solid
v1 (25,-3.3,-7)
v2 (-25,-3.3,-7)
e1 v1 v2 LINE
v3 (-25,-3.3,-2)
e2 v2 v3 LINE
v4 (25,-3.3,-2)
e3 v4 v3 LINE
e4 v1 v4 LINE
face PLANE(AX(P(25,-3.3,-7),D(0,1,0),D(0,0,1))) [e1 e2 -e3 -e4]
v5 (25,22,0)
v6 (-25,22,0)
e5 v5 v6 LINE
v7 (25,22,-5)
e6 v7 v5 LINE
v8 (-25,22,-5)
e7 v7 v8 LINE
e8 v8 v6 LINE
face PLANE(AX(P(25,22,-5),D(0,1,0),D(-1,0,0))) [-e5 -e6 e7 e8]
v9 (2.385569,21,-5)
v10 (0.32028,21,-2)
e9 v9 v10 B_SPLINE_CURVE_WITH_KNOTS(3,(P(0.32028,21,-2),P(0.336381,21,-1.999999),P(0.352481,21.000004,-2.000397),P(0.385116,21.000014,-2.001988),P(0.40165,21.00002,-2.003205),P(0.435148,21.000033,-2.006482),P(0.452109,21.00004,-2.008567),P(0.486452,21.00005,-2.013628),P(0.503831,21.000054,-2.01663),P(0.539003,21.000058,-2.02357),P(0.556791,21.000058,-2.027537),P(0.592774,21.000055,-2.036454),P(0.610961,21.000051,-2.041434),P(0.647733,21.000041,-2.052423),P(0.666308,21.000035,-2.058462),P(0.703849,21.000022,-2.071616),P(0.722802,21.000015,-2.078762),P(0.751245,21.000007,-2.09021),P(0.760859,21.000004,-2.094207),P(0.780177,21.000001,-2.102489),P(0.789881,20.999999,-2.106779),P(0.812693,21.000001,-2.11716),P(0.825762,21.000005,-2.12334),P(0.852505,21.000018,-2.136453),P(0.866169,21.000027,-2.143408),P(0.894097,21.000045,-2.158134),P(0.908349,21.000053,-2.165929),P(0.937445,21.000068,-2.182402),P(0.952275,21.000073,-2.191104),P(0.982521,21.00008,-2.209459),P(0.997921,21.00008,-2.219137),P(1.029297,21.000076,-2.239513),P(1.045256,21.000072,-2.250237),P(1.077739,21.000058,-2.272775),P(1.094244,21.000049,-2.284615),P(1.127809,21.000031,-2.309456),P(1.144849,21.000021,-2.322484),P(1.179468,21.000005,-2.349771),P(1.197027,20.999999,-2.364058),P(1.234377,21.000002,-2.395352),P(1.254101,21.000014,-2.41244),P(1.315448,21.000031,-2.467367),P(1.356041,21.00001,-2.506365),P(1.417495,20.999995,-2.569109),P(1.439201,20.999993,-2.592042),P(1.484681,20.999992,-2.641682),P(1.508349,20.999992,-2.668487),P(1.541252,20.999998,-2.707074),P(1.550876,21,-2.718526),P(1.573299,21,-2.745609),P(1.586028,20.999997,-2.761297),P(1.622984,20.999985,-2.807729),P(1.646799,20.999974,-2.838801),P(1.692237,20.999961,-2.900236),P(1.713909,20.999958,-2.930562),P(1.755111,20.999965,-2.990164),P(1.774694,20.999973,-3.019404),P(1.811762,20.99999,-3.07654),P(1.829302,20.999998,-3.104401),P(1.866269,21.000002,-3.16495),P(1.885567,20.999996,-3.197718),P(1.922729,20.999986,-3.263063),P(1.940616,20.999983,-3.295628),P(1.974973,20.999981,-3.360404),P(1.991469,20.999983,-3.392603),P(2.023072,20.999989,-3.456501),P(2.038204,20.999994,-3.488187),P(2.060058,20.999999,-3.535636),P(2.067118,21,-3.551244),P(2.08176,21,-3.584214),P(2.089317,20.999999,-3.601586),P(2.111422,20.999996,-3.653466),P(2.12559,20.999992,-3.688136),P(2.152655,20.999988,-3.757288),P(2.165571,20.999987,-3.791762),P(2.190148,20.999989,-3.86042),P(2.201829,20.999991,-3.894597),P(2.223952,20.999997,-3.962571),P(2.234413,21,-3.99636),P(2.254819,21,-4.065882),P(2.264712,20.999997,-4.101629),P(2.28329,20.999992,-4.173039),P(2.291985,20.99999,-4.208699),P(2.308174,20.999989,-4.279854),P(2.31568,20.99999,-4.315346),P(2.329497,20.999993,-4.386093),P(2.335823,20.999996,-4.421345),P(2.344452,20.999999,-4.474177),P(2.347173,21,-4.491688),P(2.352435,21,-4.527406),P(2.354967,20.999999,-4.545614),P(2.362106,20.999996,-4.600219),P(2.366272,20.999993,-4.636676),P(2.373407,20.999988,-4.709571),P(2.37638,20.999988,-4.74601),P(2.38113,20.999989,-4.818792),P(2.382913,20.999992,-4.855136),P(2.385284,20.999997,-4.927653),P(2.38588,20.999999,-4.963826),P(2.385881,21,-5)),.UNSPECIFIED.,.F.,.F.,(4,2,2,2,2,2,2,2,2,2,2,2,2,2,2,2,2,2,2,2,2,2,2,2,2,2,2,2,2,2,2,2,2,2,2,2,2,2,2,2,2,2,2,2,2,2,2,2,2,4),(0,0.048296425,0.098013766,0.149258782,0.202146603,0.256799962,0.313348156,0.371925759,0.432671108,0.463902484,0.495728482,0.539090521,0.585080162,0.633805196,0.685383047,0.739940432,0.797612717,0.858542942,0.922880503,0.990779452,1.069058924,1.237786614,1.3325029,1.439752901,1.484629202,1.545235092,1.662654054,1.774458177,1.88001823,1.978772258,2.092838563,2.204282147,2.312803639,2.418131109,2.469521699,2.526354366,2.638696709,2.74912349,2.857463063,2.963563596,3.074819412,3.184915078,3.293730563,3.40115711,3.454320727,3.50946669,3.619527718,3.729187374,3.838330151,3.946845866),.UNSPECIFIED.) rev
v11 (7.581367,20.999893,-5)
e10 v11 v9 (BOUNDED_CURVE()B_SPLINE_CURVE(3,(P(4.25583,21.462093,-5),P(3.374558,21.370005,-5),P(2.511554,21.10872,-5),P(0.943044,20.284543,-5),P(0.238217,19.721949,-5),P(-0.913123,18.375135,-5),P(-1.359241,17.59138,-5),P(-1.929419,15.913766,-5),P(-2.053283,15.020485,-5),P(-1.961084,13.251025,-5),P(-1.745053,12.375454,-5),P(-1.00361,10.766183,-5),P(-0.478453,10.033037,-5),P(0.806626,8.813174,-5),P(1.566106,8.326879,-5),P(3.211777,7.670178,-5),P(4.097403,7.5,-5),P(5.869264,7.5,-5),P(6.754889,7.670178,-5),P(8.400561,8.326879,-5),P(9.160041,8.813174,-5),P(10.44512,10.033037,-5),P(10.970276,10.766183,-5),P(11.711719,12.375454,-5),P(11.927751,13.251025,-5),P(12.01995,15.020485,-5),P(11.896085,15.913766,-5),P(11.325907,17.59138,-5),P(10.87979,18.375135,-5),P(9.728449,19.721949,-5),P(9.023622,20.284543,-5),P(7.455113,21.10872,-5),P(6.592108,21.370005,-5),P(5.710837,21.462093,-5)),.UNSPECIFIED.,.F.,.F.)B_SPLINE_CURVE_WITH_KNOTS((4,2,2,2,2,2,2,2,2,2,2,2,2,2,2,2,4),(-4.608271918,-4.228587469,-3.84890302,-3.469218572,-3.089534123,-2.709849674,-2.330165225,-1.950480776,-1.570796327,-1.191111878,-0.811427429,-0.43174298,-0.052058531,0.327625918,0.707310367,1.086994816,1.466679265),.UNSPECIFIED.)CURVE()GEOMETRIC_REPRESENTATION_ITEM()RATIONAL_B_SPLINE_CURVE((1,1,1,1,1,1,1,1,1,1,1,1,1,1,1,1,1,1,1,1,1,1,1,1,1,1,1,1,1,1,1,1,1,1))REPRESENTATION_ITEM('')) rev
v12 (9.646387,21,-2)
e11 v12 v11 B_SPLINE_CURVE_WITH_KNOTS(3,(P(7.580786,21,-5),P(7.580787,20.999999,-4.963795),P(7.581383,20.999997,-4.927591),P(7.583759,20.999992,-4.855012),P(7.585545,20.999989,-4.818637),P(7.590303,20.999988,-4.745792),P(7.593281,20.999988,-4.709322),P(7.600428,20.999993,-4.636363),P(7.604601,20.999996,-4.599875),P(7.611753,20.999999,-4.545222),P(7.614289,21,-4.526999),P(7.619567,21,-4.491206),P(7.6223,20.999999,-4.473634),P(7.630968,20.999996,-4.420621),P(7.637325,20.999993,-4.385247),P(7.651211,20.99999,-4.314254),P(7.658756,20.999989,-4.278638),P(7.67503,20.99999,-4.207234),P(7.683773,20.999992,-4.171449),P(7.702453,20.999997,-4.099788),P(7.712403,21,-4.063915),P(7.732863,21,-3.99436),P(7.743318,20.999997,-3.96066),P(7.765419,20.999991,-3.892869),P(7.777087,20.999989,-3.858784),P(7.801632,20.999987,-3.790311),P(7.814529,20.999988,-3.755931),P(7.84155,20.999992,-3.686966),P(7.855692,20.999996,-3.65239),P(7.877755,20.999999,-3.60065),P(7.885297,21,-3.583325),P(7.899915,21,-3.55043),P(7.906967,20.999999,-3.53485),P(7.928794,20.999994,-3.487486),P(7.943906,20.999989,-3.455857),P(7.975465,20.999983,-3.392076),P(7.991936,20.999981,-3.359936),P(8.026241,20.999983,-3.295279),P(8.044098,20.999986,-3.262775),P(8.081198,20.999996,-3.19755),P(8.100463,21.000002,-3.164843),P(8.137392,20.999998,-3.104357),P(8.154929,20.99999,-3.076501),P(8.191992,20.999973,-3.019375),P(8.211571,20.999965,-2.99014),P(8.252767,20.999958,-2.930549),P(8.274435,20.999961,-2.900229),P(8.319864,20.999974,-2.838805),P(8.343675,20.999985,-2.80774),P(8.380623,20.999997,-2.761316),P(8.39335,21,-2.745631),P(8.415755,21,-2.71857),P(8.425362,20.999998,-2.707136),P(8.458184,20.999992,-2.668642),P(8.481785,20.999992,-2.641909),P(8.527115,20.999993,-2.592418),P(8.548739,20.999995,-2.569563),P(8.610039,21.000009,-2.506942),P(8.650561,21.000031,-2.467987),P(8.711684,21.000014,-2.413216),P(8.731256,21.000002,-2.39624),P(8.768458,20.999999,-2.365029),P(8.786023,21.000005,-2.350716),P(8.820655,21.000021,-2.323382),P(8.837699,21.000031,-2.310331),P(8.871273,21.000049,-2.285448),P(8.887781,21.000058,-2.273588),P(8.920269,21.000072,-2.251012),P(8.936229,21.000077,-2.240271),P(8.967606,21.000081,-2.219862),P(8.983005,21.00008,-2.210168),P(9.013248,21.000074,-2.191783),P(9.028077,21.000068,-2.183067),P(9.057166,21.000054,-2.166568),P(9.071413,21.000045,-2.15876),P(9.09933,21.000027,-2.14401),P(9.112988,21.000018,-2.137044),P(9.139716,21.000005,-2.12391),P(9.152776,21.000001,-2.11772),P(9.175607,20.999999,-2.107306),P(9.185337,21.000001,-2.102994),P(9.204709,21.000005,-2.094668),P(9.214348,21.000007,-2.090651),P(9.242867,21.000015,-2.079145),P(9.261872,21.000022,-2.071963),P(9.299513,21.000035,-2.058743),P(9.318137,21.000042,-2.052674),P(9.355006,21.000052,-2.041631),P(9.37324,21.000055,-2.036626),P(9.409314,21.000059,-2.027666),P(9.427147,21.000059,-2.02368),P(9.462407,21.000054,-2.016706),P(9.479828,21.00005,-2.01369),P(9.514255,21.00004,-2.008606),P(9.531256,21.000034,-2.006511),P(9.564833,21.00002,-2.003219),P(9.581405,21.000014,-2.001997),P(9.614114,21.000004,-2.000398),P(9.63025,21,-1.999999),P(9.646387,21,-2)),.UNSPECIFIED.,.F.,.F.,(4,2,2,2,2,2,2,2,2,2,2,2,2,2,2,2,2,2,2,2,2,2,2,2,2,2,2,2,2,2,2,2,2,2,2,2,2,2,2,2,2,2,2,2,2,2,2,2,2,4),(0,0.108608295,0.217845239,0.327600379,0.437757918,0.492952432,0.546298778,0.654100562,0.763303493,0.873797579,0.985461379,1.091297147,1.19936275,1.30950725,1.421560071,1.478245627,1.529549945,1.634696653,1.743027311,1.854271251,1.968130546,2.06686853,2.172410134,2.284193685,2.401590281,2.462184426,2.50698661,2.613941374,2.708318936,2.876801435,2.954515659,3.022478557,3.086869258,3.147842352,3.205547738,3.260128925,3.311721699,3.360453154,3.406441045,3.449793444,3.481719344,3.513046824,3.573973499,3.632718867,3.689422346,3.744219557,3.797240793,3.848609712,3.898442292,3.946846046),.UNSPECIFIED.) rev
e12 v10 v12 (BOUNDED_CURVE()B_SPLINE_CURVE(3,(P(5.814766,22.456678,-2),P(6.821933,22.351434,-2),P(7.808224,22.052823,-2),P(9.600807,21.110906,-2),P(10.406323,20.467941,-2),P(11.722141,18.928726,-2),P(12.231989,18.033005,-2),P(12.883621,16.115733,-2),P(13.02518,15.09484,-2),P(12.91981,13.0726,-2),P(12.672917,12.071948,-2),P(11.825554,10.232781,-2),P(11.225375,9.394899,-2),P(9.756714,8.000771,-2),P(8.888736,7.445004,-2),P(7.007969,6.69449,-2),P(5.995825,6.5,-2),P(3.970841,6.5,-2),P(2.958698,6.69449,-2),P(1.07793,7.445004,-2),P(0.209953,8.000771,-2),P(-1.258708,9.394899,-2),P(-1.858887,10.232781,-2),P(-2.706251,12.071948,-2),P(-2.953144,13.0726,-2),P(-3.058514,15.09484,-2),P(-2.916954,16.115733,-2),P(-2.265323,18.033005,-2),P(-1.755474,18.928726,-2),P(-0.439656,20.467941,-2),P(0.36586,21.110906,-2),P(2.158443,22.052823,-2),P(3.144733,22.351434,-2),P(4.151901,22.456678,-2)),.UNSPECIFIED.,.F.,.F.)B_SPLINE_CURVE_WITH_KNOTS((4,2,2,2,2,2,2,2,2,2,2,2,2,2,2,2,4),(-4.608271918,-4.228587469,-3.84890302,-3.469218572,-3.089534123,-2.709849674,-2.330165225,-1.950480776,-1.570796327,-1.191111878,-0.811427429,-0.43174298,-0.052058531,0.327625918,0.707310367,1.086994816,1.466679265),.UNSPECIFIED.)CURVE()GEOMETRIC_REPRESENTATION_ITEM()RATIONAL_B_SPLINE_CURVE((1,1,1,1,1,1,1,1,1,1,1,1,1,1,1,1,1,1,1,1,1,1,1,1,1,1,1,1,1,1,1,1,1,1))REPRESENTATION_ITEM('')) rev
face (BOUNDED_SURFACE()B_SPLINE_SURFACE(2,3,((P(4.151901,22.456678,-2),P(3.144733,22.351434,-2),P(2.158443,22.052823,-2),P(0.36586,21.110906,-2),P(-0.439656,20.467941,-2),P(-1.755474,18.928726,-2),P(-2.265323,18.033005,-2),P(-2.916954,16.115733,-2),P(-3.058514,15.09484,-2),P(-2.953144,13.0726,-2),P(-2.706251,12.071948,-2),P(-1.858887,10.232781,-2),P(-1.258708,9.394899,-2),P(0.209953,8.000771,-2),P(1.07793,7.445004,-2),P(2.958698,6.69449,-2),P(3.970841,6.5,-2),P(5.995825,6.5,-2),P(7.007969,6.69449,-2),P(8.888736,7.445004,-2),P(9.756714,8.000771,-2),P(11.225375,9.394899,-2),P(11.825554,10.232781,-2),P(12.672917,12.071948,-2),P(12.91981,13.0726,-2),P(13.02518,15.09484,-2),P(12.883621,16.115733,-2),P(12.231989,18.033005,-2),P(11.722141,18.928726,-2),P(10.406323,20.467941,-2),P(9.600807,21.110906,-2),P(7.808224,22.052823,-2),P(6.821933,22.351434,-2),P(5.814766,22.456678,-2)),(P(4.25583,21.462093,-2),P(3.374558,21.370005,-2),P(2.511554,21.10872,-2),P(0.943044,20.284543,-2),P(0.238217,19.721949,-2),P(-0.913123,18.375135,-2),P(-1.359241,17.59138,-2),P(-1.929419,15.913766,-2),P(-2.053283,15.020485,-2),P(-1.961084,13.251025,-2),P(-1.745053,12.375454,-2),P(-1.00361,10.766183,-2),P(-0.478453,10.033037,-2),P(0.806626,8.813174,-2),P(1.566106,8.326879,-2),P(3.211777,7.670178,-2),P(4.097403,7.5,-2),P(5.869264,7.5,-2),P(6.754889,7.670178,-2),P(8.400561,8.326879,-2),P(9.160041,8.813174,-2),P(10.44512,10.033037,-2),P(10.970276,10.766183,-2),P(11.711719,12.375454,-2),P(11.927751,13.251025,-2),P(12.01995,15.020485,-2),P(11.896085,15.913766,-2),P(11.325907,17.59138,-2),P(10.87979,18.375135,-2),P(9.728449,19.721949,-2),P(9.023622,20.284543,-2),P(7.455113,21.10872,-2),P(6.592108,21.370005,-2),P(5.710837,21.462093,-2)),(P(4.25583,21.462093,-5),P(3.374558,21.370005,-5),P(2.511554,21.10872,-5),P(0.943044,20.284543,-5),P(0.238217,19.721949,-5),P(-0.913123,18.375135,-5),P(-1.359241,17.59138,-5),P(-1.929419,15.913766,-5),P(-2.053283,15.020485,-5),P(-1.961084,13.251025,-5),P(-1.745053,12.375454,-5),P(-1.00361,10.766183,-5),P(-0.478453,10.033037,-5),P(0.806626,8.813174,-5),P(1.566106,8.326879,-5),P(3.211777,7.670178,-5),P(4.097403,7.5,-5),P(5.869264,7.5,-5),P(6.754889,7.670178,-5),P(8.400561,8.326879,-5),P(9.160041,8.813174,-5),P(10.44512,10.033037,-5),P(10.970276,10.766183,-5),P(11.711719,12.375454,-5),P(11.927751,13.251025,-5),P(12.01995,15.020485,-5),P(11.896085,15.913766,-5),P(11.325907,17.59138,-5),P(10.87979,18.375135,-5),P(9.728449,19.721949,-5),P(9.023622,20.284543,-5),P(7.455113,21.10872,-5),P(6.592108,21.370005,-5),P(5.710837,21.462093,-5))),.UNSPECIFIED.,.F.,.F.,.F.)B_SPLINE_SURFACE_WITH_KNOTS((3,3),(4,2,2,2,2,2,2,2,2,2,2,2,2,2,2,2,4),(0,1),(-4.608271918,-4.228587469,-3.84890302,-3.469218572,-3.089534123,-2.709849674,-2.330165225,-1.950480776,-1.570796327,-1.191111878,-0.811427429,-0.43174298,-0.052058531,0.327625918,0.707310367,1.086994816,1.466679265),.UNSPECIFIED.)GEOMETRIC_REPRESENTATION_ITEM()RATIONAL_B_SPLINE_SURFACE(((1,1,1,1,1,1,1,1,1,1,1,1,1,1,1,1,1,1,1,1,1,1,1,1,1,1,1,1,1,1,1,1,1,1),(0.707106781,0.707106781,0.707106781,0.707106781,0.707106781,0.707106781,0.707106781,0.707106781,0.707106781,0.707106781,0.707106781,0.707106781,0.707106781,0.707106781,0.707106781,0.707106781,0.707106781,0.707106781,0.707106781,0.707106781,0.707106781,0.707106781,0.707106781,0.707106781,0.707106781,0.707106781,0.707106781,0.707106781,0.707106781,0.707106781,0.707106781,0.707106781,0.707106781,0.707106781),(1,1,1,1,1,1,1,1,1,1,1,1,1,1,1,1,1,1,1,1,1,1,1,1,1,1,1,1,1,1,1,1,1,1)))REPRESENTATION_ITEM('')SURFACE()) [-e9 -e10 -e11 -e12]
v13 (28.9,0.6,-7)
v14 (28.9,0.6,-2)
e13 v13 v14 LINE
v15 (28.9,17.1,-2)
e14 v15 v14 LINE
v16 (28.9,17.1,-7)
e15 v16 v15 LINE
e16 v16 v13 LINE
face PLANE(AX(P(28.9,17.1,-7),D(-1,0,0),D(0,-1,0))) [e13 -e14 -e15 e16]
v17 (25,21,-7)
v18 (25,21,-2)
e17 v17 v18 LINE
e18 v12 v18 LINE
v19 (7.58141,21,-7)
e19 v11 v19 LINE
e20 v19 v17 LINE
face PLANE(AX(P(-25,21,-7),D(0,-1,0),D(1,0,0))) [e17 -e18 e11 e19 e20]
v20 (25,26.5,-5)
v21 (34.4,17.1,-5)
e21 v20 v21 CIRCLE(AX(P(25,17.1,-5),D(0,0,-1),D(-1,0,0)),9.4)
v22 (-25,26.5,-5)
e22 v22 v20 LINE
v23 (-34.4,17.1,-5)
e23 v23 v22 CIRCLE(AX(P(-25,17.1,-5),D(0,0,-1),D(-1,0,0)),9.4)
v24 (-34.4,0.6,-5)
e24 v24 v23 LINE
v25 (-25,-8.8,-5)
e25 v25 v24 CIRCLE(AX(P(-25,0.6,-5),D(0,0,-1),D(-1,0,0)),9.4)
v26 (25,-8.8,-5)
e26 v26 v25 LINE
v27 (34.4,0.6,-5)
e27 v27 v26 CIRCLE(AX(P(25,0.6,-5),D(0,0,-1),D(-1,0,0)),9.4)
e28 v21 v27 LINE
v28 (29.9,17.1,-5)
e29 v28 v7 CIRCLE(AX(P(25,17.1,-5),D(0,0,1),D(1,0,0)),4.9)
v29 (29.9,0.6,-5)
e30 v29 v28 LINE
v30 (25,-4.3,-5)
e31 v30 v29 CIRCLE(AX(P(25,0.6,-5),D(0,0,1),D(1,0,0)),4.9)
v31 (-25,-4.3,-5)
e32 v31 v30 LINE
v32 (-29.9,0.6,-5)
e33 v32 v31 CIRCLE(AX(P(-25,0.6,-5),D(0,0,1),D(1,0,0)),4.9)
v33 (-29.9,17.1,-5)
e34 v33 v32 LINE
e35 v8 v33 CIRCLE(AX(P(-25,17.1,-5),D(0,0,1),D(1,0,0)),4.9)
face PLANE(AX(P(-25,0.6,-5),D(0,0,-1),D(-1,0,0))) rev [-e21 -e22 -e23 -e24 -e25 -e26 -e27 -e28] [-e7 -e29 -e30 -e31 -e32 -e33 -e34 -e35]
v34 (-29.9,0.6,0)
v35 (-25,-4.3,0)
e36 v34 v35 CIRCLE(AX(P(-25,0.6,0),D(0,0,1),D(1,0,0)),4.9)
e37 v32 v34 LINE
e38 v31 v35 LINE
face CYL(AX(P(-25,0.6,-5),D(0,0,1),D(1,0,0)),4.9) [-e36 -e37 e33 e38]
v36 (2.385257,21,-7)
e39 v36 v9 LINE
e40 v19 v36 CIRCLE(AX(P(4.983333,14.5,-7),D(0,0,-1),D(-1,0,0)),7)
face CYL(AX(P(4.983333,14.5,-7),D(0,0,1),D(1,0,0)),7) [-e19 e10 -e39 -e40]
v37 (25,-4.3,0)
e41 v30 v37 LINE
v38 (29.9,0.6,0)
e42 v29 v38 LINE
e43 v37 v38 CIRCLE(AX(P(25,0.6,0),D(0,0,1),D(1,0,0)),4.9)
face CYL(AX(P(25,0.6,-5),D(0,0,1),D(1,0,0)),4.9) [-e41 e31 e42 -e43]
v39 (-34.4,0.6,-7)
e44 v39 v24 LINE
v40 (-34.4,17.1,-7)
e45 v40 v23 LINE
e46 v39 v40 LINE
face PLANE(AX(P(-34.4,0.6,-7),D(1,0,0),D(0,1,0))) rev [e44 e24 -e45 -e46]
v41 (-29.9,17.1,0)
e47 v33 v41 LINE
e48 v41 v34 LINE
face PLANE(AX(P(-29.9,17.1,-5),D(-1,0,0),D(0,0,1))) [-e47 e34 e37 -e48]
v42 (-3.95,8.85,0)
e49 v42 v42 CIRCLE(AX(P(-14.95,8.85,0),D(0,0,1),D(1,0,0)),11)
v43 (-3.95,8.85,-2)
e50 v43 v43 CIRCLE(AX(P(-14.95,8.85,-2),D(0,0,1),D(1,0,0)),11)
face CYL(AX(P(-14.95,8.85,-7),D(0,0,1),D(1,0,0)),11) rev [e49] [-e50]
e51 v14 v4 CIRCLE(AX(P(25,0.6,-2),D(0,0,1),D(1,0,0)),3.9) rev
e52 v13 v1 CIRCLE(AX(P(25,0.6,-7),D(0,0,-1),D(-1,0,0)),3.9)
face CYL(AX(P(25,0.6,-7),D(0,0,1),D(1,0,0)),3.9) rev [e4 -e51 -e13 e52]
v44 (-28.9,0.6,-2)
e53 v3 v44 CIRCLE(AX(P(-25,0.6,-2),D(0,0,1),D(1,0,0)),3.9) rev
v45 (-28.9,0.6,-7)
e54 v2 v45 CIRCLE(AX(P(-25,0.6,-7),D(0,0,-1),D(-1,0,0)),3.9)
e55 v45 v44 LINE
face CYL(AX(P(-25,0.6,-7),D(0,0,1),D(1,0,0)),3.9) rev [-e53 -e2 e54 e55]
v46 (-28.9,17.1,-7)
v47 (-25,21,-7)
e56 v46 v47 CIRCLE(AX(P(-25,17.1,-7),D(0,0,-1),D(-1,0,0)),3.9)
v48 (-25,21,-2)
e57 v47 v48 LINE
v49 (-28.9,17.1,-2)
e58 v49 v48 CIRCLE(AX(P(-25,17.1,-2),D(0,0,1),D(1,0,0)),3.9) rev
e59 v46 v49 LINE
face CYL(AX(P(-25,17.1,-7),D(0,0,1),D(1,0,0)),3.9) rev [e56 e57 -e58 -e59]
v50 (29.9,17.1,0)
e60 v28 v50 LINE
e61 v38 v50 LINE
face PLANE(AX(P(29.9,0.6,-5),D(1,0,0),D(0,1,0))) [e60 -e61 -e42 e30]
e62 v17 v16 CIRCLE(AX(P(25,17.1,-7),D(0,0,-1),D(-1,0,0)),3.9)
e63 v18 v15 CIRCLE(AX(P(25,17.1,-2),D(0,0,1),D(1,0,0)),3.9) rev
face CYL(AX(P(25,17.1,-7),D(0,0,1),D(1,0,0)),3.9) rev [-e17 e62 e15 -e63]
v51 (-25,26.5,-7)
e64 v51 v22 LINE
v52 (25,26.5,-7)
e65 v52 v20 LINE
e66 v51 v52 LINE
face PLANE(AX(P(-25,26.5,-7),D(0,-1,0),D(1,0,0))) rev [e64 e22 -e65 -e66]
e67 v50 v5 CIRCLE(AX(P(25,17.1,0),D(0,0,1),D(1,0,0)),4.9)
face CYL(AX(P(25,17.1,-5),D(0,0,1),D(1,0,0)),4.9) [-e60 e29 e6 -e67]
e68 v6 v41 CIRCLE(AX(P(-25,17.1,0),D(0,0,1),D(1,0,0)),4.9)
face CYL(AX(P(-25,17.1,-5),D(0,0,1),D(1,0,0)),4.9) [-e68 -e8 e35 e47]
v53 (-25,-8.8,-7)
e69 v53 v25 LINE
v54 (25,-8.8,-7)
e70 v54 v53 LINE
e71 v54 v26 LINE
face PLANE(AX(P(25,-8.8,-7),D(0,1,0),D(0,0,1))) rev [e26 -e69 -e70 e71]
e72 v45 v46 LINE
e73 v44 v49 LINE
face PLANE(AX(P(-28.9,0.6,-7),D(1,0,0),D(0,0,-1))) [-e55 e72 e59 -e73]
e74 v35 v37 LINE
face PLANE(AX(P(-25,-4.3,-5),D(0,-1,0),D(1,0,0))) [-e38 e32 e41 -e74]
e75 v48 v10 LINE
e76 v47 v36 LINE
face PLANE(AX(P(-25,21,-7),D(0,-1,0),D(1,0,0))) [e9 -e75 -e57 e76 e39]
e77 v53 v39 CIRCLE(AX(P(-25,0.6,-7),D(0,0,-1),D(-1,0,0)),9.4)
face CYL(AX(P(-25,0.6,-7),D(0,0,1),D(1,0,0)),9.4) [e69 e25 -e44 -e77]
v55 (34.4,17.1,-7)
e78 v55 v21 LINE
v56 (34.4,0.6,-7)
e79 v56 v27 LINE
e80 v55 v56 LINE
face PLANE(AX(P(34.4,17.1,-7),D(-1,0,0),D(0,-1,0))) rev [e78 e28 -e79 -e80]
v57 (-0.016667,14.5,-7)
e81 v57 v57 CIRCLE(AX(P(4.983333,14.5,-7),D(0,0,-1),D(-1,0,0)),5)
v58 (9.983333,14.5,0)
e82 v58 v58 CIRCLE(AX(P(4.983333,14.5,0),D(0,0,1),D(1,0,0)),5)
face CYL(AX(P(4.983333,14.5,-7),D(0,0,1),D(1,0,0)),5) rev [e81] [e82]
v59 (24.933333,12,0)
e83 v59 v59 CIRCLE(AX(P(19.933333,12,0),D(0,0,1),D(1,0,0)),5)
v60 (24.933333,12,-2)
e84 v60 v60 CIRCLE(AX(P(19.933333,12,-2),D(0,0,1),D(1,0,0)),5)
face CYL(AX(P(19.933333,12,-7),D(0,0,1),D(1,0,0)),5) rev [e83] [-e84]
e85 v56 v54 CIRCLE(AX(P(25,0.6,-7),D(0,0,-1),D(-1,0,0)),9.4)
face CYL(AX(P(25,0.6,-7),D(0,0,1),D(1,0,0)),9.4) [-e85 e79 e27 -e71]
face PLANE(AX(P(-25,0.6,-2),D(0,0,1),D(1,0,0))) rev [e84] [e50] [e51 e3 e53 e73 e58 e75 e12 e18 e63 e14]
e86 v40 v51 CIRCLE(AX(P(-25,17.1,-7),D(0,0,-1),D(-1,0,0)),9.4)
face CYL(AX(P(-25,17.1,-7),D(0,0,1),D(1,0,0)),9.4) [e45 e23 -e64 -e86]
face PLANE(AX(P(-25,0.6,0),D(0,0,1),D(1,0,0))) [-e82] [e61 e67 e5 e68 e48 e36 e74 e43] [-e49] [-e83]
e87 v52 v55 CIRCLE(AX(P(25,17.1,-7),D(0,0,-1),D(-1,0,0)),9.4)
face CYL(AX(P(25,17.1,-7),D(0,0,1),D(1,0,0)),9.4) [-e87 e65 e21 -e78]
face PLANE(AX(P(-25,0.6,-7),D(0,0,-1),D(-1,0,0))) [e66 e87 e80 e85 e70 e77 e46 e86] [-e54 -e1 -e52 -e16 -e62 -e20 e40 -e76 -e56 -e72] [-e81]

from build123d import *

# Parameters (mm, degrees)
BOSS_EXTRUDE1_DEPTH = 5
BOSS_EXTRUDE3_DEPTH = 2
CUT_EXTRUDE1_START  = -3
CUT_EXTRUDE1_DEPTH  = 3
SKETCH4_R           = 5
SKETCH4_R_2         = 11
CUT_EXTRUDE2_DEPTH  = 44.984201709
SKETCH5_R           = 7
SKETCH5_R_2         = 5
BOSS_EXTRUDE4_DEPTH = 5
FILLET1_SIZE        = 1
FILLET1_SIZE_2      = 3


with BuildPart() as part:
    # Sketch1 → Boss-Extrude1 (new body)
    with BuildSketch(Plane.XY):
        with BuildLine():
            Line((-29.9, 17.1), (-29.9, 0.6))
            ThreePointArc((-29.9, 0.6), (-28.464823228, -2.864823228), (-25, -4.3))
            Line((-25, -4.3), (25, -4.3))
            ThreePointArc((25, -4.3), (28.464823228, -2.864823228), (29.9, 0.6))
            Line((29.9, 0.6), (29.9, 17.1))
            ThreePointArc((29.9, 17.1), (28.464823228, 20.564823228), (25, 22))
            Line((25, 22), (-25, 22))
            ThreePointArc((-25, 22), (-28.464823228, 20.564823228), (-29.9, 17.1))
        make_face()
    extrude(amount=-BOSS_EXTRUDE1_DEPTH)

    # Sketch2 → Boss-Extrude3 (add)
    with BuildSketch(Plane(origin=(0, 0, -5), x_dir=(-1, 0, 0), z_dir=(0, 0, -1))):
        with BuildLine():
            Line((34.4, 0.6), (34.4, 17.1))
            ThreePointArc((34.4, 17.1), (31.646803743, 23.746803743), (25, 26.5))
            Line((25, 26.5), (-25, 26.5))
            ThreePointArc((-25, 26.5), (-31.646803743, 23.746803743), (-34.4, 17.1))
            Line((-34.4, 17.1), (-34.4, 0.6))
            ThreePointArc((-34.4, 0.6), (-31.646803743, -6.046803743), (-25, -8.8))
            Line((-25, -8.8), (25, -8.8))
            ThreePointArc((25, -8.8), (31.646803743, -6.046803743), (34.4, 0.6))
        make_face()
        with BuildLine():
            Line((28.9, 0.6), (28.9, 17.1))
            ThreePointArc((28.9, 17.1), (27.757716447, 19.857716447), (25, 21))
            Line((25, 21), (-25, 21))
            ThreePointArc((-25, 21), (-27.757716447, 19.857716447), (-28.9, 17.1))
            Line((-28.9, 17.1), (-28.9, 0.6))
            ThreePointArc((-28.9, 0.6), (-27.757716447, -2.157716447), (-25, -3.3))
            Line((-25, -3.3), (25, -3.3))
            ThreePointArc((25, -3.3), (27.757716447, -2.157716447), (28.9, 0.6))
        make_face(mode=Mode.SUBTRACT)
    extrude(amount=BOSS_EXTRUDE3_DEPTH)

    # Sketch3 → Cut-Extrude1 (cut)
    with BuildSketch(Plane(origin=(0, 0, -5), x_dir=(-1, 0, 0), z_dir=(0, 0, -1)).offset(CUT_EXTRUDE1_START)):
        with BuildLine():
            Line((-25, -3.3), (25, -3.3))
            ThreePointArc((25, -3.3), (27.757716447, -2.157716447), (28.9, 0.6))
            Line((28.9, 0.6), (28.9, 17.1))
            ThreePointArc((28.9, 17.1), (27.757716447, 19.857716447), (25, 21))
            Line((25, 21), (-25, 21))
            ThreePointArc((-25, 21), (-27.757716447, 19.857716447), (-28.9, 17.1))
            Line((-28.9, 17.1), (-28.9, 0.6))
            ThreePointArc((-28.9, 0.6), (-27.757716447, -2.157716447), (-25, -3.3))
        make_face()
    extrude(amount=CUT_EXTRUDE1_DEPTH, mode=Mode.SUBTRACT)

    # Sketch4 → Cut-Extrude2 (cut, through all)
    with BuildSketch(Plane.XY):
        with Locations((4.983333333, 14.5)):
            Circle(SKETCH4_R)
        with Locations((-14.95, 8.85)):
            Circle(SKETCH4_R_2)
        with Locations((19.933333333, 12)):
            Circle(SKETCH4_R)
    extrude(amount=-CUT_EXTRUDE2_DEPTH, mode=Mode.SUBTRACT)

    # Sketch5 → Boss-Extrude4 (add)
    with BuildSketch(Plane(origin=(0, 0, -2), x_dir=(-1, 0, 0), z_dir=(0, 0, -1))):
        with Locations((-4.983333333, 14.5)):
            Circle(SKETCH5_R)
        with Locations(Location((-4.983333333, 14.5, 0), (0, 0, 180))):
            Circle(SKETCH5_R_2, mode=Mode.SUBTRACT)
    extrude(amount=BOSS_EXTRUDE4_DEPTH)

    # Fillet1
    # an asymmetric fillet: 3, 1 mm, written as the material it adds along each edge
    with BuildSketch(Plane(origin=(4.983333333, 14.5, -2), x_dir=(-0.6399684103972102, 0.7684012192166719, 0), z_dir=(-0.7684012192166719, -0.6399684103972102, 0))) as fillet1_piece_1_section:
        with BuildLine():
            Bezier((7 + FILLET1_SIZE, 0), (7, 0), (7, FILLET1_SIZE_2), weights=[1, 0.707106781, 1])
            Line((7, FILLET1_SIZE_2), (7, 0))
            Line((7, 0), (7 + FILLET1_SIZE, 0))
        make_face()
    fillet1_piece_1 = revolve(axis=Axis((4.983333333, 14.5, -2), (0, 0, -1)), revolution_arc=309.789463983, mode=Mode.PRIVATE)
    fillet1_piece_1 = split(fillet1_piece_1, bisect_by=Plane(origin=(1.135555839, 21, -2.732538618), z_dir=(0, -1, 0)), keep=Keep.TOP, mode=Mode.PRIVATE)
    add(fillet1_piece_1)
    with BuildSketch(Plane(origin=(4.983333333, 14.5, -2), x_dir=(-1, 0, 0), z_dir=(0, -1, 0))) as fillet1_piece_2_section:
        with BuildLine():
            Bezier((7 + FILLET1_SIZE, 0), (7, 0), (7, FILLET1_SIZE_2), weights=[1, 0.707106781, 1])
            Line((7, FILLET1_SIZE_2), (7, 0))
            Line((7, 0), (7 + FILLET1_SIZE, 0))
        make_face()
    fillet1_piece_2 = revolve(axis=Axis((4.983333333, 14.5, -2), (0, 0, -1)), revolution_arc=129.61571024, mode=Mode.PRIVATE)
    fillet1_piece_2 = split(fillet1_piece_2, bisect_by=Plane(origin=(-1.041526042, 21, -2.873194596), z_dir=(0, -1, 0)), keep=Keep.TOP, mode=Mode.PRIVATE)
    add(fillet1_piece_2)


solid = part.part
